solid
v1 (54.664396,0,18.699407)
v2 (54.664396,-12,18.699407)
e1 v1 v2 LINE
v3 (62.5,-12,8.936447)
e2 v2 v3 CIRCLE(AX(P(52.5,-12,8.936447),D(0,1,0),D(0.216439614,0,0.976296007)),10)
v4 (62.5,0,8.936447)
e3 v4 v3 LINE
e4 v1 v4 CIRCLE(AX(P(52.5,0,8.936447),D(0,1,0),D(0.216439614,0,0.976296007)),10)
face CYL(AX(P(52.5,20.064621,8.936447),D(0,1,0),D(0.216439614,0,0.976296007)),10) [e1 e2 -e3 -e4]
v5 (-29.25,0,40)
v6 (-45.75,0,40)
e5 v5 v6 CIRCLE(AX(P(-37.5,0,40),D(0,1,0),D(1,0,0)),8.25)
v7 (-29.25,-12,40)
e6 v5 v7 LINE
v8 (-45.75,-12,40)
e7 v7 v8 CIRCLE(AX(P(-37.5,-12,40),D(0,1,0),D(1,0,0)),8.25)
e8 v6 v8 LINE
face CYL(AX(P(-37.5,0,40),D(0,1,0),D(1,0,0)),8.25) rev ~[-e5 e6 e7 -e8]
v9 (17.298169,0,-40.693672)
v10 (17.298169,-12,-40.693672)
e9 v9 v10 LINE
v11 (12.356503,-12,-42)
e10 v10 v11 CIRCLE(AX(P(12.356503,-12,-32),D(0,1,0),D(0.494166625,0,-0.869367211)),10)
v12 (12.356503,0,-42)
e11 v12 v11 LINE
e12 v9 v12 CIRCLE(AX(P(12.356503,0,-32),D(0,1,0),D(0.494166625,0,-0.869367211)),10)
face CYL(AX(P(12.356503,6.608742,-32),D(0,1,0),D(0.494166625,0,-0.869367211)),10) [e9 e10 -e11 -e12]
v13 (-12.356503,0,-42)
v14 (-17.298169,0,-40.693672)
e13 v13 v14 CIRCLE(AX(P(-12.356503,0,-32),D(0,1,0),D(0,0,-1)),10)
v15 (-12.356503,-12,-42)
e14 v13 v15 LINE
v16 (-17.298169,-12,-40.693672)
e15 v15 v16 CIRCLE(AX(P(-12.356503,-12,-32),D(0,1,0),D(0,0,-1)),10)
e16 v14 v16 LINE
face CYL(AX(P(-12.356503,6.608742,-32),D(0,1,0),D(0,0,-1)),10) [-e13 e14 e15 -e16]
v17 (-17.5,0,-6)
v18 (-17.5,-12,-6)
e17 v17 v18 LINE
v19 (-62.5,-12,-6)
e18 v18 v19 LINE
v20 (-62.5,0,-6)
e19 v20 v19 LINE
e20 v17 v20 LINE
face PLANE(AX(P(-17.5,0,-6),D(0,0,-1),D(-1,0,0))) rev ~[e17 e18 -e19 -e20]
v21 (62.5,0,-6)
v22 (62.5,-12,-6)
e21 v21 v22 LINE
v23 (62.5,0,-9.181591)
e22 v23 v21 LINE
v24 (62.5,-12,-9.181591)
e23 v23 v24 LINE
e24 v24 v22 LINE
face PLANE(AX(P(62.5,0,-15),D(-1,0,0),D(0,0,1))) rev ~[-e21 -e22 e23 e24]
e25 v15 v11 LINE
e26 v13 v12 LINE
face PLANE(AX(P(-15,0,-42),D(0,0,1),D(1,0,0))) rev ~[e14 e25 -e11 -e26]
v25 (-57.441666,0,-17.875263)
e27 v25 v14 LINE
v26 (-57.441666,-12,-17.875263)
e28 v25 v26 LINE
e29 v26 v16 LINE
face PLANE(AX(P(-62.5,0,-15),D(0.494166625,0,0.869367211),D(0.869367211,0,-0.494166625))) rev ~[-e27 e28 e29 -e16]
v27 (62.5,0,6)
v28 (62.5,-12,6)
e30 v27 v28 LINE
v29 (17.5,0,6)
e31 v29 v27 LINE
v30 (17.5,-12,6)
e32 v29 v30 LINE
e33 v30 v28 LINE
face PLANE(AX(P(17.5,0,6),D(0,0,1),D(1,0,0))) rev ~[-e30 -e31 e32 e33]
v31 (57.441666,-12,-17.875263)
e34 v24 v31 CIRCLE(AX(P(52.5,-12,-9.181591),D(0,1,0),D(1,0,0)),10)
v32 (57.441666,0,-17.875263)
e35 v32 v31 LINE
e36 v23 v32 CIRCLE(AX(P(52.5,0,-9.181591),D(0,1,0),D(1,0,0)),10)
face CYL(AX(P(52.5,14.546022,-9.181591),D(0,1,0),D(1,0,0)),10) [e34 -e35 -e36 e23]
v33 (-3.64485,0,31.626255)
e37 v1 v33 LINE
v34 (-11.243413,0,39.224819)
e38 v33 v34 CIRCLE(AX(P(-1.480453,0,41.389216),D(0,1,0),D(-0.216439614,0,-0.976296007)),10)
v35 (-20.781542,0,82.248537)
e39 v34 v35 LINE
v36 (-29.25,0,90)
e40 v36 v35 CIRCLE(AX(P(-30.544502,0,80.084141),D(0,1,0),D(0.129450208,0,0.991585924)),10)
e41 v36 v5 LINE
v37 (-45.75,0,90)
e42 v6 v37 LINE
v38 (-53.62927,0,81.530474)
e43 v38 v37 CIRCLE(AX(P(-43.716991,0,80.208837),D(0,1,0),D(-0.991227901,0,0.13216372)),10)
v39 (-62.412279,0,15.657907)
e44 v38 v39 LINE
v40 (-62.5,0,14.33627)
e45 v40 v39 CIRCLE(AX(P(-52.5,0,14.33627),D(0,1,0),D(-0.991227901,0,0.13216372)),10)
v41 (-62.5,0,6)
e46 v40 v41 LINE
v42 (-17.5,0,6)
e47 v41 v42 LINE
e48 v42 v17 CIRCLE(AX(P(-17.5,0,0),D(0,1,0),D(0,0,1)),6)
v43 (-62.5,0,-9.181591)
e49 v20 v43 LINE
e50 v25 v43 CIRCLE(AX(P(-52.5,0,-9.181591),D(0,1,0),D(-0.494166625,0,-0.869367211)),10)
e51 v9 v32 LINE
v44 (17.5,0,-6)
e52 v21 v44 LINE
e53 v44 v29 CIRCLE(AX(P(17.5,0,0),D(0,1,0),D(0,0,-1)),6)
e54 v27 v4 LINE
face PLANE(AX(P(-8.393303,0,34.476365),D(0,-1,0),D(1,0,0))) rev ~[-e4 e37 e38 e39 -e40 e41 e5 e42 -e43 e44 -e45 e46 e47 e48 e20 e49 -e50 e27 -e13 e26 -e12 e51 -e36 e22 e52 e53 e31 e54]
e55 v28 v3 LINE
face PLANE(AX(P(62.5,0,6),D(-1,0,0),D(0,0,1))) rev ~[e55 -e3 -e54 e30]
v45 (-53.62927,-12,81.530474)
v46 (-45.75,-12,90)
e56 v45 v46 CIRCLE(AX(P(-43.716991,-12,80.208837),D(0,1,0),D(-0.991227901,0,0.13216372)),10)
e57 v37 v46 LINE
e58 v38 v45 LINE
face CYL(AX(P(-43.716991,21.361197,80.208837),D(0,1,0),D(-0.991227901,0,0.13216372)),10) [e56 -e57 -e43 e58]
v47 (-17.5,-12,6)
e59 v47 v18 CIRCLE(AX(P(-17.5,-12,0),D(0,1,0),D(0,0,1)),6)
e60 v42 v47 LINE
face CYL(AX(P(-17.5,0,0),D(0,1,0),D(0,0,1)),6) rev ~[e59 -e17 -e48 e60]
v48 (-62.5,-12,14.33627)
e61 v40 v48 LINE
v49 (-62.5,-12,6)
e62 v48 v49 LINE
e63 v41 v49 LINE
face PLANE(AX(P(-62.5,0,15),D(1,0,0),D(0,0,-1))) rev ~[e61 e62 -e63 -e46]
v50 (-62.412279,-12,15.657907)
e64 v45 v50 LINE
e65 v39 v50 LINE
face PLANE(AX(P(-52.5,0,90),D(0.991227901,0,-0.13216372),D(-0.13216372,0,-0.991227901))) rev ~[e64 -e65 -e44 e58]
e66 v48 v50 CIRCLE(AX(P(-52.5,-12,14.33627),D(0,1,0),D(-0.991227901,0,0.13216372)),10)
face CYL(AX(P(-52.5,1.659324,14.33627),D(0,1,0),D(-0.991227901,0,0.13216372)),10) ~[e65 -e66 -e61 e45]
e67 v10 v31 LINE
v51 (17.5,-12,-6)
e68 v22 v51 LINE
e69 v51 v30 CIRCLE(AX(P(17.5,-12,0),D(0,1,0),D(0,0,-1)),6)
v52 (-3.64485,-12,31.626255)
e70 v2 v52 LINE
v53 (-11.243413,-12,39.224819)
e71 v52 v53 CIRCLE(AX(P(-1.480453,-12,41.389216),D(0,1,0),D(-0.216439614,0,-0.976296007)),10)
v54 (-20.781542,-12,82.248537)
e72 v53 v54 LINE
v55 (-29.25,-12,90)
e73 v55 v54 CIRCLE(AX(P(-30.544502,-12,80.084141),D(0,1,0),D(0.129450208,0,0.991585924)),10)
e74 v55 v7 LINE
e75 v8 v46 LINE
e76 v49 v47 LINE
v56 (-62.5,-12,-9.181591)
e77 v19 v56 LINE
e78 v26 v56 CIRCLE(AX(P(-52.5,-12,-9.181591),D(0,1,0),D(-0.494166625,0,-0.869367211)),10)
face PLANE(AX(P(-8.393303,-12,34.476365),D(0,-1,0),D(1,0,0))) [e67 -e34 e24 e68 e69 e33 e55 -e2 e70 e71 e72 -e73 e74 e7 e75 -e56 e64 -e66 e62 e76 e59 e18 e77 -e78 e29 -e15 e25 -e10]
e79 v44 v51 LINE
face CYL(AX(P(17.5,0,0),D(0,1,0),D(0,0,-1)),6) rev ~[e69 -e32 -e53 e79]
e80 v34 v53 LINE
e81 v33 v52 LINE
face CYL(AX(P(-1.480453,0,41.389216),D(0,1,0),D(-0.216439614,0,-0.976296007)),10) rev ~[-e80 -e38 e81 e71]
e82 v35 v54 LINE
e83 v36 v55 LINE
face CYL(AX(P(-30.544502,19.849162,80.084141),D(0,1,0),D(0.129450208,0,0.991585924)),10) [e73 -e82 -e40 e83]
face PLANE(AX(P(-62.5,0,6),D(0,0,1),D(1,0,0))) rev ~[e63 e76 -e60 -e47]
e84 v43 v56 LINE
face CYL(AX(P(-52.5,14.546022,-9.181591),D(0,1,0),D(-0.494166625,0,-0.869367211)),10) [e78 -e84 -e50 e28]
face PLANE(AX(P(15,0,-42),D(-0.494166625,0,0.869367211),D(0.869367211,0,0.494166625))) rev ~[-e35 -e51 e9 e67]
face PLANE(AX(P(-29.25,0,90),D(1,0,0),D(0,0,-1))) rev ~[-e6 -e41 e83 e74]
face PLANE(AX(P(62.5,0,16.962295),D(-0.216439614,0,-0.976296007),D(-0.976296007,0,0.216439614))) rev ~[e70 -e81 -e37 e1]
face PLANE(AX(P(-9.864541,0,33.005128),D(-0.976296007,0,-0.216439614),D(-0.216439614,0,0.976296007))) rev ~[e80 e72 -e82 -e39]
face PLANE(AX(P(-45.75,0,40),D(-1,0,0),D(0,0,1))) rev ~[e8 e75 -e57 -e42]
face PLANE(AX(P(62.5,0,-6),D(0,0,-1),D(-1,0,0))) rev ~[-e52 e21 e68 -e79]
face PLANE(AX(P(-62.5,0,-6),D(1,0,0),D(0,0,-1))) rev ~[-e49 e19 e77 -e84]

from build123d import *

# Parameters (mm, degrees)
F1_DEPTH     = 12
F2_T1_DEPTH  = 12
F2_T3_DEPTH  = 54.7223945877
F2_T5_DEPTH  = 15.3186487605
F2_T7_DEPTH  = 41.0920435526
F2_T9_DEPTH  = 25.2174840277
F2_T11_DEPTH = 25.2174840277
F2_T13_DEPTH = 41.0920435526
F2_T15_DEPTH = 52.1292425836
F2_T17_DEPTH = 51.6983242764


# Not quite as in the source:
# - a fillet or chamfer that OpenCascade refuses, or shapes differently, is made with other operations: its cross-section is extruded or revolved along the edge and cut away or added


with BuildPart() as f1:
    # F0 (on Front) → F1 (new body)
    with BuildSketch(Plane.XZ):
        with BuildLine():
            Line((-52.5, 90), (-62.5, 15))
            Line((-62.5, 15), (-62.5, 6))
            Line((-62.5, 6), (-17.5, 6))
            ThreePointArc((-17.5, 6), (-11.5, 0), (-17.5, -6))
            Line((-17.5, -6), (-62.5, -6))
            Line((-62.5, -6), (-62.5, -15))
            Line((-62.5, -15), (-15, -42))
            Line((-15, -42), (15, -42))
            Line((15, -42), (62.5, -15))
            Line((62.5, -15), (62.5, -6))
            Line((62.5, -6), (17.5, -6))
            ThreePointArc((17.5, -6), (11.5, 0), (17.5, 6))
            Line((17.5, 6), (62.5, 6))
            Line((62.5, 6), (62.5, 16.9622953511))
            Line((62.5, 16.9622953511), (-9.86454105, 33.0051278665))
            Line((-9.86454105, 33.0051278665), (-22.5, 90))
            Line((-22.5, 90), (-29.25, 90))
            Line((-29.25, 90), (-29.25, 40))
            ThreePointArc((-29.25, 40), (-37.5, 31.75), (-45.75, 40))
            Line((-45.75, 40), (-45.75, 90))
            Line((-45.75, 90), (-52.5, 90))
        make_face()
    extrude(amount=F1_DEPTH)

    # F2: fillet of radius 10 on 9 edges, made by hand

    # F2_s2 → F2_t1 (join)
    with BuildSketch(Plane.XZ):
        with BuildLine():
            ThreePointArc((-3.6448495312, 31.6262554535), (-8.5515212037, 34.3181477128), (-11.243413463, 39.2248193853))
            Line((-11.243413463, 39.2248193853), (-9.86454105, 33.0051278665))
            Line((-9.86454105, 33.0051278665), (-3.6448495312, 31.6262554535))
        make_face()
    extrude(amount=F2_T1_DEPTH)

    # F2_s4 → F2_t3 (cut)
    with BuildSketch(Plane.XZ.offset(-21.3611972939)):
        with BuildLine():
            ThreePointArc((-53.62927012, 81.5304741001), (-51.0385819893, 87.0201735553), (-45.75, 90))
            Line((-45.75, 90), (-52.5, 90))
            Line((-52.5, 90), (-53.62927012, 81.5304741001))
        make_face()
    extrude(amount=F2_T3_DEPTH, mode=Mode.SUBTRACT)

    # F2_s6 → F2_t5 (cut)
    with BuildSketch(Plane.XZ.offset(-1.6593243803)):
        with BuildLine():
            ThreePointArc((-62.4122790068, 15.6579074488), (-62.478045652, 14.9985428246), (-62.5, 14.3362702479))
            Line((-62.5, 14.3362702479), (-62.5, 15))
            Line((-62.5, 15), (-62.4122790068, 15.6579074488))
        make_face()
    extrude(amount=F2_T5_DEPTH, mode=Mode.SUBTRACT)

    # F2_s8 → F2_t7 (cut)
    with BuildSketch(Plane.XZ.offset(-14.5460217763)):
        with BuildLine():
            ThreePointArc((-57.4416662495, -17.875263395), (-61.1433981308, -14.2106735867), (-62.5, -9.1815912895))
            Line((-62.5, -9.1815912895), (-62.5, -15))
            Line((-62.5, -15), (-57.4416662495, -17.875263395))
        make_face()
    extrude(amount=F2_T7_DEPTH, mode=Mode.SUBTRACT)

    # F2_s10 → F2_t9 (cut)
    with BuildSketch(Plane.XZ.offset(-6.6087420138)):
        with BuildLine():
            ThreePointArc((-12.3565031945, -42), (-14.9122104297, -41.6679036263), (-17.2981694439, -40.6936721056))
            Line((-17.2981694439, -40.6936721056), (-15, -42))
            Line((-15, -42), (-12.3565031945, -42))
        make_face()
    extrude(amount=F2_T9_DEPTH, mode=Mode.SUBTRACT)

    # F2_s12 → F2_t11 (cut)
    with BuildSketch(Plane.XZ.offset(-6.6087420138)):
        with BuildLine():
            ThreePointArc((17.2981694439, -40.6936721056), (14.9122104297, -41.6679036263), (12.3565031945, -42))
            Line((12.3565031945, -42), (15, -42))
            Line((15, -42), (17.2981694439, -40.6936721056))
        make_face()
    extrude(amount=F2_T11_DEPTH, mode=Mode.SUBTRACT)

    # F2_s14 → F2_t13 (cut)
    with BuildSketch(Plane.XZ.offset(-14.5460217763)):
        with BuildLine():
            ThreePointArc((62.5, -9.1815912895), (61.1433981308, -14.2106735867), (57.4416662495, -17.875263395))
            Line((57.4416662495, -17.875263395), (62.5, -15))
            Line((62.5, -15), (62.5, -9.1815912895))
        make_face()
    extrude(amount=F2_T13_DEPTH, mode=Mode.SUBTRACT)

    # F2_s16 → F2_t15 (cut)
    with BuildSketch(Plane.XZ.offset(-20.0646212918)):
        with BuildLine():
            ThreePointArc((54.6643961394, 18.6994069056), (60.2988448309, 15.1956815563), (62.5, 8.9364468344))
            Line((62.5, 8.9364468344), (62.5, 16.9622953511))
            Line((62.5, 16.9622953511), (54.6643961394, 18.6994069056))
        make_face()
    extrude(amount=F2_T15_DEPTH, mode=Mode.SUBTRACT)

    # F2_s18 → F2_t17 (cut)
    with BuildSketch(Plane.XZ.offset(-19.8491621382)):
        with BuildLine():
            ThreePointArc((-29.25, 90), (-23.7926014307, 87.4605787727), (-20.7815420039, 82.2485369039))
            Line((-20.7815420039, 82.2485369039), (-22.5, 90))
            Line((-22.5, 90), (-29.25, 90))
        make_face()
    extrude(amount=F2_T17_DEPTH, mode=Mode.SUBTRACT)


solid = f1.part
